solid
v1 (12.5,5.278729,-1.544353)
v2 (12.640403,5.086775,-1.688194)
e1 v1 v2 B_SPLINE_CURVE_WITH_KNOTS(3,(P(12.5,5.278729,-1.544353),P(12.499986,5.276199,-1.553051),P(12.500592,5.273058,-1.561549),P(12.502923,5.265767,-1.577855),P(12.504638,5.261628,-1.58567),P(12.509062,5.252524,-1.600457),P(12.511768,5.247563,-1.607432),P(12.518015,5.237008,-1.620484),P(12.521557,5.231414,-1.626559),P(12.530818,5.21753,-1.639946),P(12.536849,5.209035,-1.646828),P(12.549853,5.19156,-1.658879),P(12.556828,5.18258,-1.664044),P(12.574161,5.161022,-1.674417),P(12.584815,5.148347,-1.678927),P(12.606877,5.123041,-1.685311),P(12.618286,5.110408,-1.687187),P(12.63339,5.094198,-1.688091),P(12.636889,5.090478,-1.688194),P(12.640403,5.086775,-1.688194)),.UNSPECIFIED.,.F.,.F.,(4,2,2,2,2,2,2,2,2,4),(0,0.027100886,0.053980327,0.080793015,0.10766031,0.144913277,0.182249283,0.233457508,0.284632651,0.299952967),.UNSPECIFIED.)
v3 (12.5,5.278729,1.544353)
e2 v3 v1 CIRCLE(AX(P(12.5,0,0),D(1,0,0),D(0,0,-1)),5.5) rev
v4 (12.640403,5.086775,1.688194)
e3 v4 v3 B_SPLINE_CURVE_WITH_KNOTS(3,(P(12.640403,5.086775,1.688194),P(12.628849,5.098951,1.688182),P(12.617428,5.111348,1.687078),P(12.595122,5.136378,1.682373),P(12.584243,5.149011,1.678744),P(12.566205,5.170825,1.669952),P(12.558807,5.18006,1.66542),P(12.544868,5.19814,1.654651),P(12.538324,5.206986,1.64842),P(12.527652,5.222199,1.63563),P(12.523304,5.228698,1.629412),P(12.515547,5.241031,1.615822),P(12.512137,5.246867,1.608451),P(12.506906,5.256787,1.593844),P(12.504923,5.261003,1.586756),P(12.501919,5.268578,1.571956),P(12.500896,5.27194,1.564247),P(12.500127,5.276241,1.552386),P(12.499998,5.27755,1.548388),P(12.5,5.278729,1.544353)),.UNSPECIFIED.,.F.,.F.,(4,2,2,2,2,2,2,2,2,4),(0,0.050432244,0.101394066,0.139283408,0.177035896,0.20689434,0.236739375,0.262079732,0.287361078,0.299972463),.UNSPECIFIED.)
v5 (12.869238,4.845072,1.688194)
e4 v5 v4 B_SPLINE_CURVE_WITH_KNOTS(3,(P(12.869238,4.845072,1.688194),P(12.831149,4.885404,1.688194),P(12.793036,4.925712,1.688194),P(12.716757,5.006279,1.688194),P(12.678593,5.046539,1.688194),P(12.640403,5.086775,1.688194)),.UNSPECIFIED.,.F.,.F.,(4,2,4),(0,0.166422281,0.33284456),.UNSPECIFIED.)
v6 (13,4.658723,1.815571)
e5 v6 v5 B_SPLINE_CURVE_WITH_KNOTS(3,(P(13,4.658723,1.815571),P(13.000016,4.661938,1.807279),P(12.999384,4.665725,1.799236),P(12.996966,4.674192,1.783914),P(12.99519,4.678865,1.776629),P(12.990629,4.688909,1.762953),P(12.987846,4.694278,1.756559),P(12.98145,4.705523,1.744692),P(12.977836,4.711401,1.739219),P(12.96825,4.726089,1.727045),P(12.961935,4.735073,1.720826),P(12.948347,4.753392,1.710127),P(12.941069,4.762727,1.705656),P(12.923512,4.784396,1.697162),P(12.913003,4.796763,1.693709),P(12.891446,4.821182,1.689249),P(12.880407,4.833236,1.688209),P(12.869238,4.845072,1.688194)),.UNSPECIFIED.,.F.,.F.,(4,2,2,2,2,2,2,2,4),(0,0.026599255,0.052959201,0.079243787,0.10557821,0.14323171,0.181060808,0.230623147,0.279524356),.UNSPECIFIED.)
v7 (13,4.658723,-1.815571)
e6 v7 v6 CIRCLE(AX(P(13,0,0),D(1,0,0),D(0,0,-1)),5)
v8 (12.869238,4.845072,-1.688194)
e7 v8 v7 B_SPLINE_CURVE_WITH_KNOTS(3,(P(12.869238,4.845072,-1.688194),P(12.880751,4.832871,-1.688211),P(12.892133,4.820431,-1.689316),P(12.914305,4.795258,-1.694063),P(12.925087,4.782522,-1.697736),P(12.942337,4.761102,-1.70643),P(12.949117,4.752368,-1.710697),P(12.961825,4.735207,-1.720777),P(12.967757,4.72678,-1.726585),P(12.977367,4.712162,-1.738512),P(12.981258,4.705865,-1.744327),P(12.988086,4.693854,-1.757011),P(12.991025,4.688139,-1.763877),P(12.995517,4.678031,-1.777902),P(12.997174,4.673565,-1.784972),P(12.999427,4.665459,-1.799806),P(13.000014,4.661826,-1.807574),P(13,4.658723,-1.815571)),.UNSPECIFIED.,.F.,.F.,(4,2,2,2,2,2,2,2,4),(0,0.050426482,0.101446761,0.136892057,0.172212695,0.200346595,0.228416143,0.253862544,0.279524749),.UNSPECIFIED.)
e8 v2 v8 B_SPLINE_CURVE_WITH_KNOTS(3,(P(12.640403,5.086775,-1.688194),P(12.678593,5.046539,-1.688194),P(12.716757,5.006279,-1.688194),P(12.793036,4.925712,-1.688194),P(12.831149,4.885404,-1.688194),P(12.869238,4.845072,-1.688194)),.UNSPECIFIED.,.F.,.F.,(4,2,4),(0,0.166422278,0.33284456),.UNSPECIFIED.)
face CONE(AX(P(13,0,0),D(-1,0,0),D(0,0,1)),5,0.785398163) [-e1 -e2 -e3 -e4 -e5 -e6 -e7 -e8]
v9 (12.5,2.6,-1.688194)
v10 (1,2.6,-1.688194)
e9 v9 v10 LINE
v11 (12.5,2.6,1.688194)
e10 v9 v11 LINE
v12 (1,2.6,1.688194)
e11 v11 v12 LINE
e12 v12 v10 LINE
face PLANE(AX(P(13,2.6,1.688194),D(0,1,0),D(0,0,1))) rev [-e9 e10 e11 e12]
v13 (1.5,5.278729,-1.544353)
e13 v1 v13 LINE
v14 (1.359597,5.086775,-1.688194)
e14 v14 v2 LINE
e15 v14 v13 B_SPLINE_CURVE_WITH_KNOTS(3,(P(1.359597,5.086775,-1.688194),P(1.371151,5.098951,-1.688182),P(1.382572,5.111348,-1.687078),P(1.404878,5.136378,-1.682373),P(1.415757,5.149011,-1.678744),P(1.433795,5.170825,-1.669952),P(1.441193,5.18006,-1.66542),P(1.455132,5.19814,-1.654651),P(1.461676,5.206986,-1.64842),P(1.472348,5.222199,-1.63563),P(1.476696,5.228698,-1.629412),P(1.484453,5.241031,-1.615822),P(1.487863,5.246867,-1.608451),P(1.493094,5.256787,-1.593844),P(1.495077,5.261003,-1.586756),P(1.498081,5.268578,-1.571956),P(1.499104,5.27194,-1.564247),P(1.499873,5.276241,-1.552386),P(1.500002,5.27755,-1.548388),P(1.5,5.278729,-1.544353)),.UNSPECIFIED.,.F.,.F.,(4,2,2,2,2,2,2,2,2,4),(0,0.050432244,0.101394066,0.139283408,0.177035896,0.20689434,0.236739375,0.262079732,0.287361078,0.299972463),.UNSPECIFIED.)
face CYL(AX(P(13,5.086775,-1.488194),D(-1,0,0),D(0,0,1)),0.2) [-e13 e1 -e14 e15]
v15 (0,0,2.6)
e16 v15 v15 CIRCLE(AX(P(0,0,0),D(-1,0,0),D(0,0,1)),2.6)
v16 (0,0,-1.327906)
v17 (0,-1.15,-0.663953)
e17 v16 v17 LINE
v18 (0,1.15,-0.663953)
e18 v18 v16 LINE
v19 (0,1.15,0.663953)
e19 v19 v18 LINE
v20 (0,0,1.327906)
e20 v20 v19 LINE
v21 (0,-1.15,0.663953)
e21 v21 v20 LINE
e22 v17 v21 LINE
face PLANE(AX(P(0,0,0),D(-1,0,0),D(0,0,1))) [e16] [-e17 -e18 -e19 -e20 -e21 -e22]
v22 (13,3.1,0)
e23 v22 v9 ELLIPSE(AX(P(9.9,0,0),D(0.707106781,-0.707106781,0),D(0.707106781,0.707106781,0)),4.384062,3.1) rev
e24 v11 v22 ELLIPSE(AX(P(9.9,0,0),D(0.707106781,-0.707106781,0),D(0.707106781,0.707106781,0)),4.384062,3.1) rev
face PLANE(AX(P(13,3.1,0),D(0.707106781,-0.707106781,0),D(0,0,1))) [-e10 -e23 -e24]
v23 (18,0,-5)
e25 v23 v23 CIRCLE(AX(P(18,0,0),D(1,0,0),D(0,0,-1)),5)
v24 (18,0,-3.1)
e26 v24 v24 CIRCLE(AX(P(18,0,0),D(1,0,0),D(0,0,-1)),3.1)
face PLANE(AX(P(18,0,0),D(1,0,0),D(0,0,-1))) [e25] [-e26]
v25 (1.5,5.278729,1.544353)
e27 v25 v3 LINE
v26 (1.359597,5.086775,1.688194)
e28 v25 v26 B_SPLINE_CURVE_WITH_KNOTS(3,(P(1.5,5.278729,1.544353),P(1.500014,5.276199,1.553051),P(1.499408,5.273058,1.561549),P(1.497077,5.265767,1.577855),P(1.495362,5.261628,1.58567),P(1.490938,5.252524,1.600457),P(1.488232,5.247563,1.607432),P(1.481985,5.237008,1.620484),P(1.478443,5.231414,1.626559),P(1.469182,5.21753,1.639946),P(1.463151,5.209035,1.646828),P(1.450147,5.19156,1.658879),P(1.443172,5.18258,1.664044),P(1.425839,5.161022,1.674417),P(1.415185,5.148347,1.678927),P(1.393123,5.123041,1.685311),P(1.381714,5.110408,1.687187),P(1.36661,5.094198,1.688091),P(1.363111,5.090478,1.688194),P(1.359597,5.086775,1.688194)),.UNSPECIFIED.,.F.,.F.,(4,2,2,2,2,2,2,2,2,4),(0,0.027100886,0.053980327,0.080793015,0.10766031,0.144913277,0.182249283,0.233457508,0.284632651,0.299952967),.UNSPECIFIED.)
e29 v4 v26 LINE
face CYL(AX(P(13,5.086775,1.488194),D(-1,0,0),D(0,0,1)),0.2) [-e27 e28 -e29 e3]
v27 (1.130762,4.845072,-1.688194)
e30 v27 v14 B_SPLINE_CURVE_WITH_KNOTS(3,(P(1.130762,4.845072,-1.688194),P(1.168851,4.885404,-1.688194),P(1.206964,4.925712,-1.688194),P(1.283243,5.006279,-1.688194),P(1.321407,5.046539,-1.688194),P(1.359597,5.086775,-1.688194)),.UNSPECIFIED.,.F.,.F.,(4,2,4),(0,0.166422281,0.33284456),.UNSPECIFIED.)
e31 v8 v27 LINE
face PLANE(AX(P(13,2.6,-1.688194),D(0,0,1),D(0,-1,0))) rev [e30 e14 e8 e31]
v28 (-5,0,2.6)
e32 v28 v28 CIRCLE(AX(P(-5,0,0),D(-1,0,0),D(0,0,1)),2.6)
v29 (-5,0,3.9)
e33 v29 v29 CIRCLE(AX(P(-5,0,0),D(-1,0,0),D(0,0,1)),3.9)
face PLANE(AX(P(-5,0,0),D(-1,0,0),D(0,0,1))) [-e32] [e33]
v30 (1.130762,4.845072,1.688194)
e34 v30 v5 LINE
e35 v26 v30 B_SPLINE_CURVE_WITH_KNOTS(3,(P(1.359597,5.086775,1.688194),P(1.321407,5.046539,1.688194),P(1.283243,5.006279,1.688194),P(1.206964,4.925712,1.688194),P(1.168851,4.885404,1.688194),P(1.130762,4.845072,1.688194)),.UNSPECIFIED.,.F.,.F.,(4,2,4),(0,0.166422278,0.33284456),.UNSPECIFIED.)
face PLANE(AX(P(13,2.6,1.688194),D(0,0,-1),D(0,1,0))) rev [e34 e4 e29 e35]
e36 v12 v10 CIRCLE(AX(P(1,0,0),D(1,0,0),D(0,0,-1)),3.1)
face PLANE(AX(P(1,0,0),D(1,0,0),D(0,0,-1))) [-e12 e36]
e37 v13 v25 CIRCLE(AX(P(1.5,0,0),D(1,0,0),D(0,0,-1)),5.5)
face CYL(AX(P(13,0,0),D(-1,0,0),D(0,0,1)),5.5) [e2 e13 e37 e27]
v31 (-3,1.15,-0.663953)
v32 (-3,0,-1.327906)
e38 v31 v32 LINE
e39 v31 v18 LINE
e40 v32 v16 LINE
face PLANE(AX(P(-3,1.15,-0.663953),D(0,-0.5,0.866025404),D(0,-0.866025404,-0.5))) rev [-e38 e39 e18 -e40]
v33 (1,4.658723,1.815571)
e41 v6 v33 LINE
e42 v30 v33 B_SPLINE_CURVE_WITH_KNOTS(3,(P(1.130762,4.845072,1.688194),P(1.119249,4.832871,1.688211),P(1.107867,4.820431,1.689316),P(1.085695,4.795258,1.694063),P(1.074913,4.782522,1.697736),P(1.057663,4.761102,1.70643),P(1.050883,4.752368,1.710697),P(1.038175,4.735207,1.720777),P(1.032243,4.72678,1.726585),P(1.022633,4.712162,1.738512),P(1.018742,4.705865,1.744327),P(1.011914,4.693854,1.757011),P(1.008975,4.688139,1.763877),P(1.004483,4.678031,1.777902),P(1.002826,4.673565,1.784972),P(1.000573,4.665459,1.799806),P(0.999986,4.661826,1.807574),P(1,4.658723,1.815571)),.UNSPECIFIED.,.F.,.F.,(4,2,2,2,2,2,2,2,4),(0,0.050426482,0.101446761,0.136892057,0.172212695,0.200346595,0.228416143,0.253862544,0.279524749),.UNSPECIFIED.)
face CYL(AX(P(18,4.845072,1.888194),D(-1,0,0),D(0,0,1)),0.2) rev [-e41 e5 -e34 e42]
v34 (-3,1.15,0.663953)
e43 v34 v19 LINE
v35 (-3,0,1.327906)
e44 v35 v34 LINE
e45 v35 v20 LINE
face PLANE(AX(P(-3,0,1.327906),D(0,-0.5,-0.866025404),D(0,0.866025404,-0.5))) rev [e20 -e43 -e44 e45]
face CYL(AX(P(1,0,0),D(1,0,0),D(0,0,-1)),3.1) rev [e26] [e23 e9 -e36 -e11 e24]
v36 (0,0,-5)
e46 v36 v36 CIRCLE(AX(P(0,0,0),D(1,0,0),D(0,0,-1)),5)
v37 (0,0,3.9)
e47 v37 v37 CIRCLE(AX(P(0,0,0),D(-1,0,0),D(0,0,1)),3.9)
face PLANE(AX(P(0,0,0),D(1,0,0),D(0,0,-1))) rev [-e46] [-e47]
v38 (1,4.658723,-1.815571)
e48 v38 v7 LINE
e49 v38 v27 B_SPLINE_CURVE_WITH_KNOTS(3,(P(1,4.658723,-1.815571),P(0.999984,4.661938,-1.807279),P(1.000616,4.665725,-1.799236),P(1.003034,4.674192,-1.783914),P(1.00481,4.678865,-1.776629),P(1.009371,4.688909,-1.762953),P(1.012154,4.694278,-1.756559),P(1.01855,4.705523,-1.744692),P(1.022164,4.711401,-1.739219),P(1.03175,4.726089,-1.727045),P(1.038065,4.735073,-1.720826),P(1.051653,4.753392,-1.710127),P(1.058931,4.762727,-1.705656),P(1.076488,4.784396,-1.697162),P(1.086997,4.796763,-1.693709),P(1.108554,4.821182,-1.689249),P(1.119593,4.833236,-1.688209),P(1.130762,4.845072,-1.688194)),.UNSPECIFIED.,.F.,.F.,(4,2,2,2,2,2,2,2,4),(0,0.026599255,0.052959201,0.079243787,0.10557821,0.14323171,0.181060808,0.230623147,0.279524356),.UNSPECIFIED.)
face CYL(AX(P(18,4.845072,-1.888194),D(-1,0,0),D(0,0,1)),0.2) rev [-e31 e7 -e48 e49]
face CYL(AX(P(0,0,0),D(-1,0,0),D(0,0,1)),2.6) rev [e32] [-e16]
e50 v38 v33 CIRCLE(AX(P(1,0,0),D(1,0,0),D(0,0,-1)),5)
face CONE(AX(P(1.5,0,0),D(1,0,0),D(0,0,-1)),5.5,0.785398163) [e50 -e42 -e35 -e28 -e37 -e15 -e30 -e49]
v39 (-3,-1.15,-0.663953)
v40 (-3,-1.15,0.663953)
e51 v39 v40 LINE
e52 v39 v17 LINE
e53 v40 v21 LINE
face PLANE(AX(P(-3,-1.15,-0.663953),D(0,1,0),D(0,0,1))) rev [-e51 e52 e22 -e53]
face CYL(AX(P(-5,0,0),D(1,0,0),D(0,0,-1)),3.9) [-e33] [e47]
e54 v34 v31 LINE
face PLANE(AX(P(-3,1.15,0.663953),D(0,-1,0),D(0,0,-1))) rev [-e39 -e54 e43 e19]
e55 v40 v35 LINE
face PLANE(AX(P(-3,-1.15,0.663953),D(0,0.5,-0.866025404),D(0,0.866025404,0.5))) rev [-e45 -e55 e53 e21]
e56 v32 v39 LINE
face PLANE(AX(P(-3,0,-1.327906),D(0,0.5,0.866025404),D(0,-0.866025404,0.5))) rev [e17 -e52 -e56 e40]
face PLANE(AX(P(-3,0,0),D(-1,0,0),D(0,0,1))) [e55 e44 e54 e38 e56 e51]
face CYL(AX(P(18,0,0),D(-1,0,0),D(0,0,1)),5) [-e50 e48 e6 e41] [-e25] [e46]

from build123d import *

# Parameters (mm, degrees)
SKETCH_1_R          = 5
EXTRUDE_1_DEPTH     = 18
SKETCH_3_R          = 3.1
CUT_EXTRUDE_1_DEPTH = 17
EXTRUDE_2_DEPTH     = 12
SKETCH_8_R          = 3.9
EXTRUDE_4_DEPTH     = 5
SKETCH_9_R          = 2.6
CUT_EXTRUDE_2_DEPTH = 5
EXTRUDE_5_DEPTH     = 3
FILLET_1_R          = 0.2
CHAMFER_1_SIZE      = 0.5


with BuildPart() as part:
    # 草图1 → 凸台-拉伸1 (new body)
    with BuildSketch(Plane(origin=(0, 0, 0), x_dir=(0, 0, -1), z_dir=(1, 0, 0))):
        Circle(SKETCH_1_R)
    extrude(amount=EXTRUDE_1_DEPTH)

    # 草图3 → 切除-拉伸1 (cut)
    with BuildSketch(Plane(origin=(18, 0, 0), x_dir=(0, 0, -1), z_dir=(1, 0, 0))):
        Circle(SKETCH_3_R)
    extrude(amount=-CUT_EXTRUDE_1_DEPTH, mode=Mode.SUBTRACT)

    # 草图5 → 凸台-拉伸2 (add)
    with BuildSketch(Plane(origin=(1, 0, 0), x_dir=(0, 0, -1), z_dir=(1, 0, 0))):
        with BuildLine():
            Line((-1.688194302, 2.6), (1.688194302, 2.6))
            Line((1.688194302, 2.6), (1.688194302, 5.234500931))
            ThreePointArc((1.688194302, 5.234500931), (0, 5.5), (-1.688194302, 5.234500931))
            Line((-1.688194302, 5.234500931), (-1.688194302, 2.6))
        make_face()
    extrude(amount=EXTRUDE_2_DEPTH)

    # 草图8 → 凸台-拉伸4 (add)
    with BuildSketch(Plane.ZY):
        Circle(SKETCH_8_R)
    extrude(amount=EXTRUDE_4_DEPTH)

    # 草图9 → 切除-拉伸2 (cut)
    with BuildSketch(Plane.ZY.offset(5)):
        Circle(SKETCH_9_R)
    extrude(amount=-CUT_EXTRUDE_2_DEPTH, mode=Mode.SUBTRACT)

    # 草图10 → 凸台-拉伸5 (add)
    with BuildSketch(Plane.ZY):
        Polygon((0.66395281, 1.15), (-0.66395281, 1.15), (-1.327905619, 0), (-0.66395281, -1.15), (0.66395281, -1.15), (1.327905619, 0), align=None)
    extrude(amount=EXTRUDE_5_DEPTH)

    # 圆角1
    fillet_1_edges = [part.edges().sort_by_distance(p)[0] for p in [
        (7, 4.70637865, 1.688194302),
        (7, 5.234500931, 1.688194302),
        (7, 4.70637865, -1.688194302),
        (7, 5.234500931, -1.688194302),
    ]]
    fillet(fillet_1_edges, radius=FILLET_1_R)

    # 倒角1
    # the kernel refuses this chamfer: 0.5 mm, written as the material it takes off along each edge
    with BuildSketch(Plane(origin=(13, 0, 0), x_dir=(0, 0.8686030413593419, -0.4955085837211114), z_dir=(0, -0.4955085837211114, -0.8686030413593419))) as chamfer_1_piece_1:
        Polygon((5.5, -CHAMFER_1_SIZE), (5.5 - CHAMFER_1_SIZE, 0), (5.5, 0), align=None)
    revolve(axis=Axis((13, 0, 0), (1, 0, 0)), revolution_arc=59.40658503, mode=Mode.SUBTRACT)
    with BuildSketch(Plane(origin=(1, 0, 0), x_dir=(0, 0.8686030413593416, -0.4955085837211117), z_dir=(0, -0.4955085837211117, -0.8686030413593416))) as chamfer_1_piece_2:
        Polygon((5.5 - CHAMFER_1_SIZE, 0), (5.5, CHAMFER_1_SIZE), (5.5, 0), align=None)
    revolve(axis=Axis((1, 0, 0), (1, 0, 0)), revolution_arc=59.40658503, mode=Mode.SUBTRACT)
    with BuildSketch(Plane(origin=(13, 2.6, 2.974035796), x_dir=(0.027495876610585623, 0.9996219169112968, 0), z_dir=(0, 0, -1))) as chamfer_1_piece_3_section:
        Polygon((CHAMFER_1_SIZE * 0.999621916911, -CHAMFER_1_SIZE * 0.0274958766106), (-CHAMFER_1_SIZE * 0.0274958766106, -CHAMFER_1_SIZE * 0.999621916911), (0, 0), align=None)
    chamfer_1_piece_3 = extrude(amount=5.948071591, mode=Mode.PRIVATE)
    chamfer_1_piece_3 = chamfer_1_piece_3 & Plane(origin=(12.821912141, 0, 0), x_dir=(0, 0, -1), z_dir=(1, 0, 0)) * Cylinder(3.1, 14, mode=Mode.PRIVATE)
    add(chamfer_1_piece_3, mode=Mode.SUBTRACT)


solid = part.part
